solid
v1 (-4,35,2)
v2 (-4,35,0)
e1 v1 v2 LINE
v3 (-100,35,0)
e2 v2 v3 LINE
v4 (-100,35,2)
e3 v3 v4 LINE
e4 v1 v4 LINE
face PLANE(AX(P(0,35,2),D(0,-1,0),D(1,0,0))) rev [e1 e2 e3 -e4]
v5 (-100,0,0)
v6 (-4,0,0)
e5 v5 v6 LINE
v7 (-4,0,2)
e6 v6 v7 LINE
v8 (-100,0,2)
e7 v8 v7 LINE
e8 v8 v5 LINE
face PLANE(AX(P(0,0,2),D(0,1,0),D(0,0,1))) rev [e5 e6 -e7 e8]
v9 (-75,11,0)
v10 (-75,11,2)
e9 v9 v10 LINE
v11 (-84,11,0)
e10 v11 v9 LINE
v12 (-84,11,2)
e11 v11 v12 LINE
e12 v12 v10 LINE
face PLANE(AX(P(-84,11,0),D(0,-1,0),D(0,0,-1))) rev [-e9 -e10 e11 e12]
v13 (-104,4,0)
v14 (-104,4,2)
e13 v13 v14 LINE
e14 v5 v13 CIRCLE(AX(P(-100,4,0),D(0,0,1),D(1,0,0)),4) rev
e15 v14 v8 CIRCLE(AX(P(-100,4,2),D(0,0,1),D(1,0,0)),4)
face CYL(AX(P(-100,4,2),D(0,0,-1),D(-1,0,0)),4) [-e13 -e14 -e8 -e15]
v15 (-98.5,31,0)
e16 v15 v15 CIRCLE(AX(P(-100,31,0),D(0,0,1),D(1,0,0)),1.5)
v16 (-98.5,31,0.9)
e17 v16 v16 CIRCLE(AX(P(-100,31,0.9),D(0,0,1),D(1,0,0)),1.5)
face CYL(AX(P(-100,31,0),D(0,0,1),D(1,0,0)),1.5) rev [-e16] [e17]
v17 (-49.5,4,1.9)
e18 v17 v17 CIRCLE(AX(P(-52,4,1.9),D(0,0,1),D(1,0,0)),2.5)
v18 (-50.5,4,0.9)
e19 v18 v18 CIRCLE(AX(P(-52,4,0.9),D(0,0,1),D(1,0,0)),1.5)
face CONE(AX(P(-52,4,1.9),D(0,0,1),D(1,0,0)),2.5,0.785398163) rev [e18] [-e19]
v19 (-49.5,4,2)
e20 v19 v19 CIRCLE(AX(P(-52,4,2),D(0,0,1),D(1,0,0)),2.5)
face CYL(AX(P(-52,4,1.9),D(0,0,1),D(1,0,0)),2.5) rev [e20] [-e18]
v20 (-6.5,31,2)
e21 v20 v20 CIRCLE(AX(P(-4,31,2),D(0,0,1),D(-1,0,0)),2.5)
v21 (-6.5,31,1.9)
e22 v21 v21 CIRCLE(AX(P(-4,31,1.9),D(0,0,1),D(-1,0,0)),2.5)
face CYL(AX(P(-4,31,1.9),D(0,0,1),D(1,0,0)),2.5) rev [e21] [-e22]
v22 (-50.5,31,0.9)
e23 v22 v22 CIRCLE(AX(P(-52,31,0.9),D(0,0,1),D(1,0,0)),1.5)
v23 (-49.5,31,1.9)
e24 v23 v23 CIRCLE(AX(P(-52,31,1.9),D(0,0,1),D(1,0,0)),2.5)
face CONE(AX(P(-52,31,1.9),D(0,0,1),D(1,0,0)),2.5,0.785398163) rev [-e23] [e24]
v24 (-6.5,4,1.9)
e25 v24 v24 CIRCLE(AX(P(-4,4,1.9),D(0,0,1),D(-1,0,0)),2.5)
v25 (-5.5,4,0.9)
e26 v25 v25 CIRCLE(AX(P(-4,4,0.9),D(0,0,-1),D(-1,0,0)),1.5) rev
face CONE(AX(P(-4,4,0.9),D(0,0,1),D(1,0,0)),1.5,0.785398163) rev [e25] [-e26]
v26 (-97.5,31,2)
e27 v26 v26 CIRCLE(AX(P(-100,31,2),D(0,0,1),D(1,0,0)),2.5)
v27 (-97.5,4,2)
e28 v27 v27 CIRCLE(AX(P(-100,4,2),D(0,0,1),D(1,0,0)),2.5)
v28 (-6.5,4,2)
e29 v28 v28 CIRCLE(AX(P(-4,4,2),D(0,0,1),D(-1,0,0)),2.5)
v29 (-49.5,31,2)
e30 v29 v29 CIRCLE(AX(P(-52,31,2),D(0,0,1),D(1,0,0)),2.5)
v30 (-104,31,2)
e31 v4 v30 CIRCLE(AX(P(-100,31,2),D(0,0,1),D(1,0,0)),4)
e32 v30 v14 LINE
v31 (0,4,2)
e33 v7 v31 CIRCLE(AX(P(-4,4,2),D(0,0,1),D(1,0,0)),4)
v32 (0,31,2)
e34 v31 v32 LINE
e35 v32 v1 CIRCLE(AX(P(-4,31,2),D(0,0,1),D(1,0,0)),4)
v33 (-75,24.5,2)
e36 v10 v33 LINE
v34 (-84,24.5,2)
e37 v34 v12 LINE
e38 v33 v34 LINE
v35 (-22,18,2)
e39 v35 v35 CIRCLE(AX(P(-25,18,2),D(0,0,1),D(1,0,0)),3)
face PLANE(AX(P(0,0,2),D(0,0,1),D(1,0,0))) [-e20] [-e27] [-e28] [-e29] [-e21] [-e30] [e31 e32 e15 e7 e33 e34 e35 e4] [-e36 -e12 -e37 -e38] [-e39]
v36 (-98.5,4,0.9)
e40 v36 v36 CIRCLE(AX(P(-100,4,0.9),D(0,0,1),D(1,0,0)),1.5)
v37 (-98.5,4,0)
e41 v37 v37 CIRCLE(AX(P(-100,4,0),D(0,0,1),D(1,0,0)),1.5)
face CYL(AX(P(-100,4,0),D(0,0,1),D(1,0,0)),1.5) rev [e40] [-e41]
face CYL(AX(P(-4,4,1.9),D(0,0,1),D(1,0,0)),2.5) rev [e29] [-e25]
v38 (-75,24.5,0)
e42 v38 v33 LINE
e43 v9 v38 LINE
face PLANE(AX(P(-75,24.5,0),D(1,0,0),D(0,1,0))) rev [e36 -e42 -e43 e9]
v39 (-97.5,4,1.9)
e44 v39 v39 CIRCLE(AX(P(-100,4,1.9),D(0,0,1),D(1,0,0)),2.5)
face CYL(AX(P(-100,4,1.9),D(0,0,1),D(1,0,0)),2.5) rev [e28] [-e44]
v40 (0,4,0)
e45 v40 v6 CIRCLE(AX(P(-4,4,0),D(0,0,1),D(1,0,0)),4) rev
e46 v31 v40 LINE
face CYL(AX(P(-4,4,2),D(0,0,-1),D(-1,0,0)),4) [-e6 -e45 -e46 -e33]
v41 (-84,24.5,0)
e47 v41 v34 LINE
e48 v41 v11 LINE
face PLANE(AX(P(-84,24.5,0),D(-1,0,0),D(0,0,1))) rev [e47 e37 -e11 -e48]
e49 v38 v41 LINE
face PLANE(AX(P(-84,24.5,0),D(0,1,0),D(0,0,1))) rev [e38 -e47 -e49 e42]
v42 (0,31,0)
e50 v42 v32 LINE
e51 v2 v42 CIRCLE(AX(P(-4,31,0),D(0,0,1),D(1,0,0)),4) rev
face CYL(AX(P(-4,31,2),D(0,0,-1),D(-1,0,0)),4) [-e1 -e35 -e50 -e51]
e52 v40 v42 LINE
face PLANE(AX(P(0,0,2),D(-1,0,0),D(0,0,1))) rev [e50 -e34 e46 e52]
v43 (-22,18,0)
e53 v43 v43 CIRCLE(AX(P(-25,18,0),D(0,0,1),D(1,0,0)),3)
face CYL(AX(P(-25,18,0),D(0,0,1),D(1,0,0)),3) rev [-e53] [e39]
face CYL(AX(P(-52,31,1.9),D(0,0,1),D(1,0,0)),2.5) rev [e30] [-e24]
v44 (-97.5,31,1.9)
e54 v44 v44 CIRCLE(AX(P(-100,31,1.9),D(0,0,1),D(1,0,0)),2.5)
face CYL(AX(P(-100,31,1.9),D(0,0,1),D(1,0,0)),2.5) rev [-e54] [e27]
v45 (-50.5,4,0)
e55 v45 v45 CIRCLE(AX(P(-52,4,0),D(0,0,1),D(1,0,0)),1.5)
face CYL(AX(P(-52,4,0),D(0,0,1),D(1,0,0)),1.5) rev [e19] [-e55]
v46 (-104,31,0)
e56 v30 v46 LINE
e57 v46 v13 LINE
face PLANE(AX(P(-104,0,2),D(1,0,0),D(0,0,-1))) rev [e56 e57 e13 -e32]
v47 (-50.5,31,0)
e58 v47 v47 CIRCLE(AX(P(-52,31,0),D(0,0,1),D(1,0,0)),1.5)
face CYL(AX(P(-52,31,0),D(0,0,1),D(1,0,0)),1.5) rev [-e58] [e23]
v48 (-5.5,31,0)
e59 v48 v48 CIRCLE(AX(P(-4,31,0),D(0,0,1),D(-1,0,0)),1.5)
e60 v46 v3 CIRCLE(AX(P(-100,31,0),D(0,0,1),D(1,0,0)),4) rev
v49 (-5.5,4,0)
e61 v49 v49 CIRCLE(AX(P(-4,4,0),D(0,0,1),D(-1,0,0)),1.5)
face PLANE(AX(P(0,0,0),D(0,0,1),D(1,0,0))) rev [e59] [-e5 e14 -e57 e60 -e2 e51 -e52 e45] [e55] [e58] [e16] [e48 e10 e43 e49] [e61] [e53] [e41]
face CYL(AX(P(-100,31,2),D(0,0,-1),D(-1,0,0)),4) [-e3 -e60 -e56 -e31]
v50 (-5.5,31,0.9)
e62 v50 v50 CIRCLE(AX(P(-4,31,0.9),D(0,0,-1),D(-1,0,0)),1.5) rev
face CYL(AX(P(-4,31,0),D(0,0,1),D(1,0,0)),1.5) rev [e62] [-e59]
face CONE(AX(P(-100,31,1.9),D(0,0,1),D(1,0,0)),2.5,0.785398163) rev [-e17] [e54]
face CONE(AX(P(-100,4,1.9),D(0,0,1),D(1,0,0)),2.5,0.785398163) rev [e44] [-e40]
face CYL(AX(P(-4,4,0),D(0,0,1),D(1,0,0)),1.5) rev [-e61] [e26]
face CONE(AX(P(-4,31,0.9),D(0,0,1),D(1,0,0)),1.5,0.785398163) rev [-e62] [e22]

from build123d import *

# Parameters (mm, degrees)
IZIM1_W                     = 104
IZIM1_H                     = 35
Y_KSEKLIK_EKSTR_ZYON1_DEPTH = 2
IZIM2_R                     = 1.5
KES_EKSTR_ZYON1_DEPTH       = 2
IZIM3_R                     = 2.5
KES_EKSTR_ZYON2_DEPTH       = 0.1
PAH2_SIZE                   = 1
IZIM4_R                     = 1.5
KES_EKSTR_ZYON3_DEPTH       = 2
IZIM5_R                     = 2.5
KES_EKSTR_ZYON4_DEPTH       = 0.1
PAH3_SIZE                   = 1
RADYUS1_R                   = 4
IZIM7_R                     = 3
IZIM7_W                     = 9
IZIM7_H                     = 13.5
KES_EKSTR_ZYON6_DEPTH       = 2


with BuildPart() as part:
    # Çizim1 → Yükseklik-Ekstrüzyon1 (new body)
    with BuildSketch(Plane.XY):
        with Locations((-52, 17.5)):
            Rectangle(IZIM1_W, IZIM1_H)
    extrude(amount=Y_KSEKLIK_EKSTR_ZYON1_DEPTH)

    # Çizim2 → Kes-Ekstrüzyon1 (cut)
    with BuildSketch(Plane.XY.offset(2)):
        with Locations((-100, 31)):
            Circle(IZIM2_R)
        with Locations((-100, 4)):
            Circle(IZIM2_R)
        with Locations(Location((-4, 4, 0), (0, 0, 180))):
            Circle(IZIM2_R)
        with Locations(Location((-4, 31, 0), (0, 0, 180))):
            Circle(IZIM2_R)
    extrude(amount=-KES_EKSTR_ZYON1_DEPTH, mode=Mode.SUBTRACT)

    # Çizim3 → Kes-Ekstrüzyon2 (cut)
    with BuildSketch(Plane.XY.offset(2)):
        with Locations((-100, 31)):
            Circle(IZIM3_R)
        with Locations((-100, 4)):
            Circle(IZIM3_R)
        with Locations(Location((-4, 4, 0), (0, 0, 180))):
            Circle(IZIM3_R)
        with Locations(Location((-4, 31, 0), (0, 0, 180))):
            Circle(IZIM3_R)
    extrude(amount=-KES_EKSTR_ZYON2_DEPTH, mode=Mode.SUBTRACT)

    # Pah2
    pah2_edges = [part.edges().sort_by_distance(p)[0] for p in [
        (-2.5, 31, 1.9),
        (-2.5, 4, 1.9),
        (-101.5, 4, 1.9),
        (-101.5, 31, 1.9),
    ]]
    chamfer(pah2_edges, length=PAH2_SIZE - 0.0001)  # a hair under: the kernel refuses the full size

    # Çizim4 → Kes-Ekstrüzyon3 (cut)
    with BuildSketch(Plane.XY.offset(2)):
        with Locations((-52, 31)):
            Circle(IZIM4_R)
        with Locations((-52, 4)):
            Circle(IZIM4_R)
    extrude(amount=-KES_EKSTR_ZYON3_DEPTH, mode=Mode.SUBTRACT)

    # Çizim5 → Kes-Ekstrüzyon4 (cut)
    with BuildSketch(Plane.XY.offset(2)):
        with Locations((-52, 31)):
            Circle(IZIM5_R)
        with Locations((-52, 4)):
            Circle(IZIM5_R)
    extrude(amount=-KES_EKSTR_ZYON4_DEPTH, mode=Mode.SUBTRACT)

    # Pah3
    pah3_edges = [part.edges().sort_by_distance(p)[0] for p in [
        (-53.5, 31, 1.9),
        (-53.5, 4, 1.9),
    ]]
    chamfer(pah3_edges, length=PAH3_SIZE - 0.0001)  # a hair under: the kernel refuses the full size

    # Radyus1
    radyus1_edges = [part.edges().sort_by_distance(p)[0] for p in [
        (0, 0, 1),
        (-104, 0, 1),
        (-104, 35, 1),
        (0, 35, 1),
    ]]
    fillet(radyus1_edges, radius=RADYUS1_R)

    # Çizim7 → Kes-Ekstrüzyon6 (cut)
    with BuildSketch(Plane.XY.offset(2)):
        with Locations((-25, 18)):
            Circle(IZIM7_R)
        with Locations((-79.5, 17.75)):
            Rectangle(IZIM7_W, IZIM7_H)
    extrude(amount=-KES_EKSTR_ZYON6_DEPTH, mode=Mode.SUBTRACT)


solid = part.part
